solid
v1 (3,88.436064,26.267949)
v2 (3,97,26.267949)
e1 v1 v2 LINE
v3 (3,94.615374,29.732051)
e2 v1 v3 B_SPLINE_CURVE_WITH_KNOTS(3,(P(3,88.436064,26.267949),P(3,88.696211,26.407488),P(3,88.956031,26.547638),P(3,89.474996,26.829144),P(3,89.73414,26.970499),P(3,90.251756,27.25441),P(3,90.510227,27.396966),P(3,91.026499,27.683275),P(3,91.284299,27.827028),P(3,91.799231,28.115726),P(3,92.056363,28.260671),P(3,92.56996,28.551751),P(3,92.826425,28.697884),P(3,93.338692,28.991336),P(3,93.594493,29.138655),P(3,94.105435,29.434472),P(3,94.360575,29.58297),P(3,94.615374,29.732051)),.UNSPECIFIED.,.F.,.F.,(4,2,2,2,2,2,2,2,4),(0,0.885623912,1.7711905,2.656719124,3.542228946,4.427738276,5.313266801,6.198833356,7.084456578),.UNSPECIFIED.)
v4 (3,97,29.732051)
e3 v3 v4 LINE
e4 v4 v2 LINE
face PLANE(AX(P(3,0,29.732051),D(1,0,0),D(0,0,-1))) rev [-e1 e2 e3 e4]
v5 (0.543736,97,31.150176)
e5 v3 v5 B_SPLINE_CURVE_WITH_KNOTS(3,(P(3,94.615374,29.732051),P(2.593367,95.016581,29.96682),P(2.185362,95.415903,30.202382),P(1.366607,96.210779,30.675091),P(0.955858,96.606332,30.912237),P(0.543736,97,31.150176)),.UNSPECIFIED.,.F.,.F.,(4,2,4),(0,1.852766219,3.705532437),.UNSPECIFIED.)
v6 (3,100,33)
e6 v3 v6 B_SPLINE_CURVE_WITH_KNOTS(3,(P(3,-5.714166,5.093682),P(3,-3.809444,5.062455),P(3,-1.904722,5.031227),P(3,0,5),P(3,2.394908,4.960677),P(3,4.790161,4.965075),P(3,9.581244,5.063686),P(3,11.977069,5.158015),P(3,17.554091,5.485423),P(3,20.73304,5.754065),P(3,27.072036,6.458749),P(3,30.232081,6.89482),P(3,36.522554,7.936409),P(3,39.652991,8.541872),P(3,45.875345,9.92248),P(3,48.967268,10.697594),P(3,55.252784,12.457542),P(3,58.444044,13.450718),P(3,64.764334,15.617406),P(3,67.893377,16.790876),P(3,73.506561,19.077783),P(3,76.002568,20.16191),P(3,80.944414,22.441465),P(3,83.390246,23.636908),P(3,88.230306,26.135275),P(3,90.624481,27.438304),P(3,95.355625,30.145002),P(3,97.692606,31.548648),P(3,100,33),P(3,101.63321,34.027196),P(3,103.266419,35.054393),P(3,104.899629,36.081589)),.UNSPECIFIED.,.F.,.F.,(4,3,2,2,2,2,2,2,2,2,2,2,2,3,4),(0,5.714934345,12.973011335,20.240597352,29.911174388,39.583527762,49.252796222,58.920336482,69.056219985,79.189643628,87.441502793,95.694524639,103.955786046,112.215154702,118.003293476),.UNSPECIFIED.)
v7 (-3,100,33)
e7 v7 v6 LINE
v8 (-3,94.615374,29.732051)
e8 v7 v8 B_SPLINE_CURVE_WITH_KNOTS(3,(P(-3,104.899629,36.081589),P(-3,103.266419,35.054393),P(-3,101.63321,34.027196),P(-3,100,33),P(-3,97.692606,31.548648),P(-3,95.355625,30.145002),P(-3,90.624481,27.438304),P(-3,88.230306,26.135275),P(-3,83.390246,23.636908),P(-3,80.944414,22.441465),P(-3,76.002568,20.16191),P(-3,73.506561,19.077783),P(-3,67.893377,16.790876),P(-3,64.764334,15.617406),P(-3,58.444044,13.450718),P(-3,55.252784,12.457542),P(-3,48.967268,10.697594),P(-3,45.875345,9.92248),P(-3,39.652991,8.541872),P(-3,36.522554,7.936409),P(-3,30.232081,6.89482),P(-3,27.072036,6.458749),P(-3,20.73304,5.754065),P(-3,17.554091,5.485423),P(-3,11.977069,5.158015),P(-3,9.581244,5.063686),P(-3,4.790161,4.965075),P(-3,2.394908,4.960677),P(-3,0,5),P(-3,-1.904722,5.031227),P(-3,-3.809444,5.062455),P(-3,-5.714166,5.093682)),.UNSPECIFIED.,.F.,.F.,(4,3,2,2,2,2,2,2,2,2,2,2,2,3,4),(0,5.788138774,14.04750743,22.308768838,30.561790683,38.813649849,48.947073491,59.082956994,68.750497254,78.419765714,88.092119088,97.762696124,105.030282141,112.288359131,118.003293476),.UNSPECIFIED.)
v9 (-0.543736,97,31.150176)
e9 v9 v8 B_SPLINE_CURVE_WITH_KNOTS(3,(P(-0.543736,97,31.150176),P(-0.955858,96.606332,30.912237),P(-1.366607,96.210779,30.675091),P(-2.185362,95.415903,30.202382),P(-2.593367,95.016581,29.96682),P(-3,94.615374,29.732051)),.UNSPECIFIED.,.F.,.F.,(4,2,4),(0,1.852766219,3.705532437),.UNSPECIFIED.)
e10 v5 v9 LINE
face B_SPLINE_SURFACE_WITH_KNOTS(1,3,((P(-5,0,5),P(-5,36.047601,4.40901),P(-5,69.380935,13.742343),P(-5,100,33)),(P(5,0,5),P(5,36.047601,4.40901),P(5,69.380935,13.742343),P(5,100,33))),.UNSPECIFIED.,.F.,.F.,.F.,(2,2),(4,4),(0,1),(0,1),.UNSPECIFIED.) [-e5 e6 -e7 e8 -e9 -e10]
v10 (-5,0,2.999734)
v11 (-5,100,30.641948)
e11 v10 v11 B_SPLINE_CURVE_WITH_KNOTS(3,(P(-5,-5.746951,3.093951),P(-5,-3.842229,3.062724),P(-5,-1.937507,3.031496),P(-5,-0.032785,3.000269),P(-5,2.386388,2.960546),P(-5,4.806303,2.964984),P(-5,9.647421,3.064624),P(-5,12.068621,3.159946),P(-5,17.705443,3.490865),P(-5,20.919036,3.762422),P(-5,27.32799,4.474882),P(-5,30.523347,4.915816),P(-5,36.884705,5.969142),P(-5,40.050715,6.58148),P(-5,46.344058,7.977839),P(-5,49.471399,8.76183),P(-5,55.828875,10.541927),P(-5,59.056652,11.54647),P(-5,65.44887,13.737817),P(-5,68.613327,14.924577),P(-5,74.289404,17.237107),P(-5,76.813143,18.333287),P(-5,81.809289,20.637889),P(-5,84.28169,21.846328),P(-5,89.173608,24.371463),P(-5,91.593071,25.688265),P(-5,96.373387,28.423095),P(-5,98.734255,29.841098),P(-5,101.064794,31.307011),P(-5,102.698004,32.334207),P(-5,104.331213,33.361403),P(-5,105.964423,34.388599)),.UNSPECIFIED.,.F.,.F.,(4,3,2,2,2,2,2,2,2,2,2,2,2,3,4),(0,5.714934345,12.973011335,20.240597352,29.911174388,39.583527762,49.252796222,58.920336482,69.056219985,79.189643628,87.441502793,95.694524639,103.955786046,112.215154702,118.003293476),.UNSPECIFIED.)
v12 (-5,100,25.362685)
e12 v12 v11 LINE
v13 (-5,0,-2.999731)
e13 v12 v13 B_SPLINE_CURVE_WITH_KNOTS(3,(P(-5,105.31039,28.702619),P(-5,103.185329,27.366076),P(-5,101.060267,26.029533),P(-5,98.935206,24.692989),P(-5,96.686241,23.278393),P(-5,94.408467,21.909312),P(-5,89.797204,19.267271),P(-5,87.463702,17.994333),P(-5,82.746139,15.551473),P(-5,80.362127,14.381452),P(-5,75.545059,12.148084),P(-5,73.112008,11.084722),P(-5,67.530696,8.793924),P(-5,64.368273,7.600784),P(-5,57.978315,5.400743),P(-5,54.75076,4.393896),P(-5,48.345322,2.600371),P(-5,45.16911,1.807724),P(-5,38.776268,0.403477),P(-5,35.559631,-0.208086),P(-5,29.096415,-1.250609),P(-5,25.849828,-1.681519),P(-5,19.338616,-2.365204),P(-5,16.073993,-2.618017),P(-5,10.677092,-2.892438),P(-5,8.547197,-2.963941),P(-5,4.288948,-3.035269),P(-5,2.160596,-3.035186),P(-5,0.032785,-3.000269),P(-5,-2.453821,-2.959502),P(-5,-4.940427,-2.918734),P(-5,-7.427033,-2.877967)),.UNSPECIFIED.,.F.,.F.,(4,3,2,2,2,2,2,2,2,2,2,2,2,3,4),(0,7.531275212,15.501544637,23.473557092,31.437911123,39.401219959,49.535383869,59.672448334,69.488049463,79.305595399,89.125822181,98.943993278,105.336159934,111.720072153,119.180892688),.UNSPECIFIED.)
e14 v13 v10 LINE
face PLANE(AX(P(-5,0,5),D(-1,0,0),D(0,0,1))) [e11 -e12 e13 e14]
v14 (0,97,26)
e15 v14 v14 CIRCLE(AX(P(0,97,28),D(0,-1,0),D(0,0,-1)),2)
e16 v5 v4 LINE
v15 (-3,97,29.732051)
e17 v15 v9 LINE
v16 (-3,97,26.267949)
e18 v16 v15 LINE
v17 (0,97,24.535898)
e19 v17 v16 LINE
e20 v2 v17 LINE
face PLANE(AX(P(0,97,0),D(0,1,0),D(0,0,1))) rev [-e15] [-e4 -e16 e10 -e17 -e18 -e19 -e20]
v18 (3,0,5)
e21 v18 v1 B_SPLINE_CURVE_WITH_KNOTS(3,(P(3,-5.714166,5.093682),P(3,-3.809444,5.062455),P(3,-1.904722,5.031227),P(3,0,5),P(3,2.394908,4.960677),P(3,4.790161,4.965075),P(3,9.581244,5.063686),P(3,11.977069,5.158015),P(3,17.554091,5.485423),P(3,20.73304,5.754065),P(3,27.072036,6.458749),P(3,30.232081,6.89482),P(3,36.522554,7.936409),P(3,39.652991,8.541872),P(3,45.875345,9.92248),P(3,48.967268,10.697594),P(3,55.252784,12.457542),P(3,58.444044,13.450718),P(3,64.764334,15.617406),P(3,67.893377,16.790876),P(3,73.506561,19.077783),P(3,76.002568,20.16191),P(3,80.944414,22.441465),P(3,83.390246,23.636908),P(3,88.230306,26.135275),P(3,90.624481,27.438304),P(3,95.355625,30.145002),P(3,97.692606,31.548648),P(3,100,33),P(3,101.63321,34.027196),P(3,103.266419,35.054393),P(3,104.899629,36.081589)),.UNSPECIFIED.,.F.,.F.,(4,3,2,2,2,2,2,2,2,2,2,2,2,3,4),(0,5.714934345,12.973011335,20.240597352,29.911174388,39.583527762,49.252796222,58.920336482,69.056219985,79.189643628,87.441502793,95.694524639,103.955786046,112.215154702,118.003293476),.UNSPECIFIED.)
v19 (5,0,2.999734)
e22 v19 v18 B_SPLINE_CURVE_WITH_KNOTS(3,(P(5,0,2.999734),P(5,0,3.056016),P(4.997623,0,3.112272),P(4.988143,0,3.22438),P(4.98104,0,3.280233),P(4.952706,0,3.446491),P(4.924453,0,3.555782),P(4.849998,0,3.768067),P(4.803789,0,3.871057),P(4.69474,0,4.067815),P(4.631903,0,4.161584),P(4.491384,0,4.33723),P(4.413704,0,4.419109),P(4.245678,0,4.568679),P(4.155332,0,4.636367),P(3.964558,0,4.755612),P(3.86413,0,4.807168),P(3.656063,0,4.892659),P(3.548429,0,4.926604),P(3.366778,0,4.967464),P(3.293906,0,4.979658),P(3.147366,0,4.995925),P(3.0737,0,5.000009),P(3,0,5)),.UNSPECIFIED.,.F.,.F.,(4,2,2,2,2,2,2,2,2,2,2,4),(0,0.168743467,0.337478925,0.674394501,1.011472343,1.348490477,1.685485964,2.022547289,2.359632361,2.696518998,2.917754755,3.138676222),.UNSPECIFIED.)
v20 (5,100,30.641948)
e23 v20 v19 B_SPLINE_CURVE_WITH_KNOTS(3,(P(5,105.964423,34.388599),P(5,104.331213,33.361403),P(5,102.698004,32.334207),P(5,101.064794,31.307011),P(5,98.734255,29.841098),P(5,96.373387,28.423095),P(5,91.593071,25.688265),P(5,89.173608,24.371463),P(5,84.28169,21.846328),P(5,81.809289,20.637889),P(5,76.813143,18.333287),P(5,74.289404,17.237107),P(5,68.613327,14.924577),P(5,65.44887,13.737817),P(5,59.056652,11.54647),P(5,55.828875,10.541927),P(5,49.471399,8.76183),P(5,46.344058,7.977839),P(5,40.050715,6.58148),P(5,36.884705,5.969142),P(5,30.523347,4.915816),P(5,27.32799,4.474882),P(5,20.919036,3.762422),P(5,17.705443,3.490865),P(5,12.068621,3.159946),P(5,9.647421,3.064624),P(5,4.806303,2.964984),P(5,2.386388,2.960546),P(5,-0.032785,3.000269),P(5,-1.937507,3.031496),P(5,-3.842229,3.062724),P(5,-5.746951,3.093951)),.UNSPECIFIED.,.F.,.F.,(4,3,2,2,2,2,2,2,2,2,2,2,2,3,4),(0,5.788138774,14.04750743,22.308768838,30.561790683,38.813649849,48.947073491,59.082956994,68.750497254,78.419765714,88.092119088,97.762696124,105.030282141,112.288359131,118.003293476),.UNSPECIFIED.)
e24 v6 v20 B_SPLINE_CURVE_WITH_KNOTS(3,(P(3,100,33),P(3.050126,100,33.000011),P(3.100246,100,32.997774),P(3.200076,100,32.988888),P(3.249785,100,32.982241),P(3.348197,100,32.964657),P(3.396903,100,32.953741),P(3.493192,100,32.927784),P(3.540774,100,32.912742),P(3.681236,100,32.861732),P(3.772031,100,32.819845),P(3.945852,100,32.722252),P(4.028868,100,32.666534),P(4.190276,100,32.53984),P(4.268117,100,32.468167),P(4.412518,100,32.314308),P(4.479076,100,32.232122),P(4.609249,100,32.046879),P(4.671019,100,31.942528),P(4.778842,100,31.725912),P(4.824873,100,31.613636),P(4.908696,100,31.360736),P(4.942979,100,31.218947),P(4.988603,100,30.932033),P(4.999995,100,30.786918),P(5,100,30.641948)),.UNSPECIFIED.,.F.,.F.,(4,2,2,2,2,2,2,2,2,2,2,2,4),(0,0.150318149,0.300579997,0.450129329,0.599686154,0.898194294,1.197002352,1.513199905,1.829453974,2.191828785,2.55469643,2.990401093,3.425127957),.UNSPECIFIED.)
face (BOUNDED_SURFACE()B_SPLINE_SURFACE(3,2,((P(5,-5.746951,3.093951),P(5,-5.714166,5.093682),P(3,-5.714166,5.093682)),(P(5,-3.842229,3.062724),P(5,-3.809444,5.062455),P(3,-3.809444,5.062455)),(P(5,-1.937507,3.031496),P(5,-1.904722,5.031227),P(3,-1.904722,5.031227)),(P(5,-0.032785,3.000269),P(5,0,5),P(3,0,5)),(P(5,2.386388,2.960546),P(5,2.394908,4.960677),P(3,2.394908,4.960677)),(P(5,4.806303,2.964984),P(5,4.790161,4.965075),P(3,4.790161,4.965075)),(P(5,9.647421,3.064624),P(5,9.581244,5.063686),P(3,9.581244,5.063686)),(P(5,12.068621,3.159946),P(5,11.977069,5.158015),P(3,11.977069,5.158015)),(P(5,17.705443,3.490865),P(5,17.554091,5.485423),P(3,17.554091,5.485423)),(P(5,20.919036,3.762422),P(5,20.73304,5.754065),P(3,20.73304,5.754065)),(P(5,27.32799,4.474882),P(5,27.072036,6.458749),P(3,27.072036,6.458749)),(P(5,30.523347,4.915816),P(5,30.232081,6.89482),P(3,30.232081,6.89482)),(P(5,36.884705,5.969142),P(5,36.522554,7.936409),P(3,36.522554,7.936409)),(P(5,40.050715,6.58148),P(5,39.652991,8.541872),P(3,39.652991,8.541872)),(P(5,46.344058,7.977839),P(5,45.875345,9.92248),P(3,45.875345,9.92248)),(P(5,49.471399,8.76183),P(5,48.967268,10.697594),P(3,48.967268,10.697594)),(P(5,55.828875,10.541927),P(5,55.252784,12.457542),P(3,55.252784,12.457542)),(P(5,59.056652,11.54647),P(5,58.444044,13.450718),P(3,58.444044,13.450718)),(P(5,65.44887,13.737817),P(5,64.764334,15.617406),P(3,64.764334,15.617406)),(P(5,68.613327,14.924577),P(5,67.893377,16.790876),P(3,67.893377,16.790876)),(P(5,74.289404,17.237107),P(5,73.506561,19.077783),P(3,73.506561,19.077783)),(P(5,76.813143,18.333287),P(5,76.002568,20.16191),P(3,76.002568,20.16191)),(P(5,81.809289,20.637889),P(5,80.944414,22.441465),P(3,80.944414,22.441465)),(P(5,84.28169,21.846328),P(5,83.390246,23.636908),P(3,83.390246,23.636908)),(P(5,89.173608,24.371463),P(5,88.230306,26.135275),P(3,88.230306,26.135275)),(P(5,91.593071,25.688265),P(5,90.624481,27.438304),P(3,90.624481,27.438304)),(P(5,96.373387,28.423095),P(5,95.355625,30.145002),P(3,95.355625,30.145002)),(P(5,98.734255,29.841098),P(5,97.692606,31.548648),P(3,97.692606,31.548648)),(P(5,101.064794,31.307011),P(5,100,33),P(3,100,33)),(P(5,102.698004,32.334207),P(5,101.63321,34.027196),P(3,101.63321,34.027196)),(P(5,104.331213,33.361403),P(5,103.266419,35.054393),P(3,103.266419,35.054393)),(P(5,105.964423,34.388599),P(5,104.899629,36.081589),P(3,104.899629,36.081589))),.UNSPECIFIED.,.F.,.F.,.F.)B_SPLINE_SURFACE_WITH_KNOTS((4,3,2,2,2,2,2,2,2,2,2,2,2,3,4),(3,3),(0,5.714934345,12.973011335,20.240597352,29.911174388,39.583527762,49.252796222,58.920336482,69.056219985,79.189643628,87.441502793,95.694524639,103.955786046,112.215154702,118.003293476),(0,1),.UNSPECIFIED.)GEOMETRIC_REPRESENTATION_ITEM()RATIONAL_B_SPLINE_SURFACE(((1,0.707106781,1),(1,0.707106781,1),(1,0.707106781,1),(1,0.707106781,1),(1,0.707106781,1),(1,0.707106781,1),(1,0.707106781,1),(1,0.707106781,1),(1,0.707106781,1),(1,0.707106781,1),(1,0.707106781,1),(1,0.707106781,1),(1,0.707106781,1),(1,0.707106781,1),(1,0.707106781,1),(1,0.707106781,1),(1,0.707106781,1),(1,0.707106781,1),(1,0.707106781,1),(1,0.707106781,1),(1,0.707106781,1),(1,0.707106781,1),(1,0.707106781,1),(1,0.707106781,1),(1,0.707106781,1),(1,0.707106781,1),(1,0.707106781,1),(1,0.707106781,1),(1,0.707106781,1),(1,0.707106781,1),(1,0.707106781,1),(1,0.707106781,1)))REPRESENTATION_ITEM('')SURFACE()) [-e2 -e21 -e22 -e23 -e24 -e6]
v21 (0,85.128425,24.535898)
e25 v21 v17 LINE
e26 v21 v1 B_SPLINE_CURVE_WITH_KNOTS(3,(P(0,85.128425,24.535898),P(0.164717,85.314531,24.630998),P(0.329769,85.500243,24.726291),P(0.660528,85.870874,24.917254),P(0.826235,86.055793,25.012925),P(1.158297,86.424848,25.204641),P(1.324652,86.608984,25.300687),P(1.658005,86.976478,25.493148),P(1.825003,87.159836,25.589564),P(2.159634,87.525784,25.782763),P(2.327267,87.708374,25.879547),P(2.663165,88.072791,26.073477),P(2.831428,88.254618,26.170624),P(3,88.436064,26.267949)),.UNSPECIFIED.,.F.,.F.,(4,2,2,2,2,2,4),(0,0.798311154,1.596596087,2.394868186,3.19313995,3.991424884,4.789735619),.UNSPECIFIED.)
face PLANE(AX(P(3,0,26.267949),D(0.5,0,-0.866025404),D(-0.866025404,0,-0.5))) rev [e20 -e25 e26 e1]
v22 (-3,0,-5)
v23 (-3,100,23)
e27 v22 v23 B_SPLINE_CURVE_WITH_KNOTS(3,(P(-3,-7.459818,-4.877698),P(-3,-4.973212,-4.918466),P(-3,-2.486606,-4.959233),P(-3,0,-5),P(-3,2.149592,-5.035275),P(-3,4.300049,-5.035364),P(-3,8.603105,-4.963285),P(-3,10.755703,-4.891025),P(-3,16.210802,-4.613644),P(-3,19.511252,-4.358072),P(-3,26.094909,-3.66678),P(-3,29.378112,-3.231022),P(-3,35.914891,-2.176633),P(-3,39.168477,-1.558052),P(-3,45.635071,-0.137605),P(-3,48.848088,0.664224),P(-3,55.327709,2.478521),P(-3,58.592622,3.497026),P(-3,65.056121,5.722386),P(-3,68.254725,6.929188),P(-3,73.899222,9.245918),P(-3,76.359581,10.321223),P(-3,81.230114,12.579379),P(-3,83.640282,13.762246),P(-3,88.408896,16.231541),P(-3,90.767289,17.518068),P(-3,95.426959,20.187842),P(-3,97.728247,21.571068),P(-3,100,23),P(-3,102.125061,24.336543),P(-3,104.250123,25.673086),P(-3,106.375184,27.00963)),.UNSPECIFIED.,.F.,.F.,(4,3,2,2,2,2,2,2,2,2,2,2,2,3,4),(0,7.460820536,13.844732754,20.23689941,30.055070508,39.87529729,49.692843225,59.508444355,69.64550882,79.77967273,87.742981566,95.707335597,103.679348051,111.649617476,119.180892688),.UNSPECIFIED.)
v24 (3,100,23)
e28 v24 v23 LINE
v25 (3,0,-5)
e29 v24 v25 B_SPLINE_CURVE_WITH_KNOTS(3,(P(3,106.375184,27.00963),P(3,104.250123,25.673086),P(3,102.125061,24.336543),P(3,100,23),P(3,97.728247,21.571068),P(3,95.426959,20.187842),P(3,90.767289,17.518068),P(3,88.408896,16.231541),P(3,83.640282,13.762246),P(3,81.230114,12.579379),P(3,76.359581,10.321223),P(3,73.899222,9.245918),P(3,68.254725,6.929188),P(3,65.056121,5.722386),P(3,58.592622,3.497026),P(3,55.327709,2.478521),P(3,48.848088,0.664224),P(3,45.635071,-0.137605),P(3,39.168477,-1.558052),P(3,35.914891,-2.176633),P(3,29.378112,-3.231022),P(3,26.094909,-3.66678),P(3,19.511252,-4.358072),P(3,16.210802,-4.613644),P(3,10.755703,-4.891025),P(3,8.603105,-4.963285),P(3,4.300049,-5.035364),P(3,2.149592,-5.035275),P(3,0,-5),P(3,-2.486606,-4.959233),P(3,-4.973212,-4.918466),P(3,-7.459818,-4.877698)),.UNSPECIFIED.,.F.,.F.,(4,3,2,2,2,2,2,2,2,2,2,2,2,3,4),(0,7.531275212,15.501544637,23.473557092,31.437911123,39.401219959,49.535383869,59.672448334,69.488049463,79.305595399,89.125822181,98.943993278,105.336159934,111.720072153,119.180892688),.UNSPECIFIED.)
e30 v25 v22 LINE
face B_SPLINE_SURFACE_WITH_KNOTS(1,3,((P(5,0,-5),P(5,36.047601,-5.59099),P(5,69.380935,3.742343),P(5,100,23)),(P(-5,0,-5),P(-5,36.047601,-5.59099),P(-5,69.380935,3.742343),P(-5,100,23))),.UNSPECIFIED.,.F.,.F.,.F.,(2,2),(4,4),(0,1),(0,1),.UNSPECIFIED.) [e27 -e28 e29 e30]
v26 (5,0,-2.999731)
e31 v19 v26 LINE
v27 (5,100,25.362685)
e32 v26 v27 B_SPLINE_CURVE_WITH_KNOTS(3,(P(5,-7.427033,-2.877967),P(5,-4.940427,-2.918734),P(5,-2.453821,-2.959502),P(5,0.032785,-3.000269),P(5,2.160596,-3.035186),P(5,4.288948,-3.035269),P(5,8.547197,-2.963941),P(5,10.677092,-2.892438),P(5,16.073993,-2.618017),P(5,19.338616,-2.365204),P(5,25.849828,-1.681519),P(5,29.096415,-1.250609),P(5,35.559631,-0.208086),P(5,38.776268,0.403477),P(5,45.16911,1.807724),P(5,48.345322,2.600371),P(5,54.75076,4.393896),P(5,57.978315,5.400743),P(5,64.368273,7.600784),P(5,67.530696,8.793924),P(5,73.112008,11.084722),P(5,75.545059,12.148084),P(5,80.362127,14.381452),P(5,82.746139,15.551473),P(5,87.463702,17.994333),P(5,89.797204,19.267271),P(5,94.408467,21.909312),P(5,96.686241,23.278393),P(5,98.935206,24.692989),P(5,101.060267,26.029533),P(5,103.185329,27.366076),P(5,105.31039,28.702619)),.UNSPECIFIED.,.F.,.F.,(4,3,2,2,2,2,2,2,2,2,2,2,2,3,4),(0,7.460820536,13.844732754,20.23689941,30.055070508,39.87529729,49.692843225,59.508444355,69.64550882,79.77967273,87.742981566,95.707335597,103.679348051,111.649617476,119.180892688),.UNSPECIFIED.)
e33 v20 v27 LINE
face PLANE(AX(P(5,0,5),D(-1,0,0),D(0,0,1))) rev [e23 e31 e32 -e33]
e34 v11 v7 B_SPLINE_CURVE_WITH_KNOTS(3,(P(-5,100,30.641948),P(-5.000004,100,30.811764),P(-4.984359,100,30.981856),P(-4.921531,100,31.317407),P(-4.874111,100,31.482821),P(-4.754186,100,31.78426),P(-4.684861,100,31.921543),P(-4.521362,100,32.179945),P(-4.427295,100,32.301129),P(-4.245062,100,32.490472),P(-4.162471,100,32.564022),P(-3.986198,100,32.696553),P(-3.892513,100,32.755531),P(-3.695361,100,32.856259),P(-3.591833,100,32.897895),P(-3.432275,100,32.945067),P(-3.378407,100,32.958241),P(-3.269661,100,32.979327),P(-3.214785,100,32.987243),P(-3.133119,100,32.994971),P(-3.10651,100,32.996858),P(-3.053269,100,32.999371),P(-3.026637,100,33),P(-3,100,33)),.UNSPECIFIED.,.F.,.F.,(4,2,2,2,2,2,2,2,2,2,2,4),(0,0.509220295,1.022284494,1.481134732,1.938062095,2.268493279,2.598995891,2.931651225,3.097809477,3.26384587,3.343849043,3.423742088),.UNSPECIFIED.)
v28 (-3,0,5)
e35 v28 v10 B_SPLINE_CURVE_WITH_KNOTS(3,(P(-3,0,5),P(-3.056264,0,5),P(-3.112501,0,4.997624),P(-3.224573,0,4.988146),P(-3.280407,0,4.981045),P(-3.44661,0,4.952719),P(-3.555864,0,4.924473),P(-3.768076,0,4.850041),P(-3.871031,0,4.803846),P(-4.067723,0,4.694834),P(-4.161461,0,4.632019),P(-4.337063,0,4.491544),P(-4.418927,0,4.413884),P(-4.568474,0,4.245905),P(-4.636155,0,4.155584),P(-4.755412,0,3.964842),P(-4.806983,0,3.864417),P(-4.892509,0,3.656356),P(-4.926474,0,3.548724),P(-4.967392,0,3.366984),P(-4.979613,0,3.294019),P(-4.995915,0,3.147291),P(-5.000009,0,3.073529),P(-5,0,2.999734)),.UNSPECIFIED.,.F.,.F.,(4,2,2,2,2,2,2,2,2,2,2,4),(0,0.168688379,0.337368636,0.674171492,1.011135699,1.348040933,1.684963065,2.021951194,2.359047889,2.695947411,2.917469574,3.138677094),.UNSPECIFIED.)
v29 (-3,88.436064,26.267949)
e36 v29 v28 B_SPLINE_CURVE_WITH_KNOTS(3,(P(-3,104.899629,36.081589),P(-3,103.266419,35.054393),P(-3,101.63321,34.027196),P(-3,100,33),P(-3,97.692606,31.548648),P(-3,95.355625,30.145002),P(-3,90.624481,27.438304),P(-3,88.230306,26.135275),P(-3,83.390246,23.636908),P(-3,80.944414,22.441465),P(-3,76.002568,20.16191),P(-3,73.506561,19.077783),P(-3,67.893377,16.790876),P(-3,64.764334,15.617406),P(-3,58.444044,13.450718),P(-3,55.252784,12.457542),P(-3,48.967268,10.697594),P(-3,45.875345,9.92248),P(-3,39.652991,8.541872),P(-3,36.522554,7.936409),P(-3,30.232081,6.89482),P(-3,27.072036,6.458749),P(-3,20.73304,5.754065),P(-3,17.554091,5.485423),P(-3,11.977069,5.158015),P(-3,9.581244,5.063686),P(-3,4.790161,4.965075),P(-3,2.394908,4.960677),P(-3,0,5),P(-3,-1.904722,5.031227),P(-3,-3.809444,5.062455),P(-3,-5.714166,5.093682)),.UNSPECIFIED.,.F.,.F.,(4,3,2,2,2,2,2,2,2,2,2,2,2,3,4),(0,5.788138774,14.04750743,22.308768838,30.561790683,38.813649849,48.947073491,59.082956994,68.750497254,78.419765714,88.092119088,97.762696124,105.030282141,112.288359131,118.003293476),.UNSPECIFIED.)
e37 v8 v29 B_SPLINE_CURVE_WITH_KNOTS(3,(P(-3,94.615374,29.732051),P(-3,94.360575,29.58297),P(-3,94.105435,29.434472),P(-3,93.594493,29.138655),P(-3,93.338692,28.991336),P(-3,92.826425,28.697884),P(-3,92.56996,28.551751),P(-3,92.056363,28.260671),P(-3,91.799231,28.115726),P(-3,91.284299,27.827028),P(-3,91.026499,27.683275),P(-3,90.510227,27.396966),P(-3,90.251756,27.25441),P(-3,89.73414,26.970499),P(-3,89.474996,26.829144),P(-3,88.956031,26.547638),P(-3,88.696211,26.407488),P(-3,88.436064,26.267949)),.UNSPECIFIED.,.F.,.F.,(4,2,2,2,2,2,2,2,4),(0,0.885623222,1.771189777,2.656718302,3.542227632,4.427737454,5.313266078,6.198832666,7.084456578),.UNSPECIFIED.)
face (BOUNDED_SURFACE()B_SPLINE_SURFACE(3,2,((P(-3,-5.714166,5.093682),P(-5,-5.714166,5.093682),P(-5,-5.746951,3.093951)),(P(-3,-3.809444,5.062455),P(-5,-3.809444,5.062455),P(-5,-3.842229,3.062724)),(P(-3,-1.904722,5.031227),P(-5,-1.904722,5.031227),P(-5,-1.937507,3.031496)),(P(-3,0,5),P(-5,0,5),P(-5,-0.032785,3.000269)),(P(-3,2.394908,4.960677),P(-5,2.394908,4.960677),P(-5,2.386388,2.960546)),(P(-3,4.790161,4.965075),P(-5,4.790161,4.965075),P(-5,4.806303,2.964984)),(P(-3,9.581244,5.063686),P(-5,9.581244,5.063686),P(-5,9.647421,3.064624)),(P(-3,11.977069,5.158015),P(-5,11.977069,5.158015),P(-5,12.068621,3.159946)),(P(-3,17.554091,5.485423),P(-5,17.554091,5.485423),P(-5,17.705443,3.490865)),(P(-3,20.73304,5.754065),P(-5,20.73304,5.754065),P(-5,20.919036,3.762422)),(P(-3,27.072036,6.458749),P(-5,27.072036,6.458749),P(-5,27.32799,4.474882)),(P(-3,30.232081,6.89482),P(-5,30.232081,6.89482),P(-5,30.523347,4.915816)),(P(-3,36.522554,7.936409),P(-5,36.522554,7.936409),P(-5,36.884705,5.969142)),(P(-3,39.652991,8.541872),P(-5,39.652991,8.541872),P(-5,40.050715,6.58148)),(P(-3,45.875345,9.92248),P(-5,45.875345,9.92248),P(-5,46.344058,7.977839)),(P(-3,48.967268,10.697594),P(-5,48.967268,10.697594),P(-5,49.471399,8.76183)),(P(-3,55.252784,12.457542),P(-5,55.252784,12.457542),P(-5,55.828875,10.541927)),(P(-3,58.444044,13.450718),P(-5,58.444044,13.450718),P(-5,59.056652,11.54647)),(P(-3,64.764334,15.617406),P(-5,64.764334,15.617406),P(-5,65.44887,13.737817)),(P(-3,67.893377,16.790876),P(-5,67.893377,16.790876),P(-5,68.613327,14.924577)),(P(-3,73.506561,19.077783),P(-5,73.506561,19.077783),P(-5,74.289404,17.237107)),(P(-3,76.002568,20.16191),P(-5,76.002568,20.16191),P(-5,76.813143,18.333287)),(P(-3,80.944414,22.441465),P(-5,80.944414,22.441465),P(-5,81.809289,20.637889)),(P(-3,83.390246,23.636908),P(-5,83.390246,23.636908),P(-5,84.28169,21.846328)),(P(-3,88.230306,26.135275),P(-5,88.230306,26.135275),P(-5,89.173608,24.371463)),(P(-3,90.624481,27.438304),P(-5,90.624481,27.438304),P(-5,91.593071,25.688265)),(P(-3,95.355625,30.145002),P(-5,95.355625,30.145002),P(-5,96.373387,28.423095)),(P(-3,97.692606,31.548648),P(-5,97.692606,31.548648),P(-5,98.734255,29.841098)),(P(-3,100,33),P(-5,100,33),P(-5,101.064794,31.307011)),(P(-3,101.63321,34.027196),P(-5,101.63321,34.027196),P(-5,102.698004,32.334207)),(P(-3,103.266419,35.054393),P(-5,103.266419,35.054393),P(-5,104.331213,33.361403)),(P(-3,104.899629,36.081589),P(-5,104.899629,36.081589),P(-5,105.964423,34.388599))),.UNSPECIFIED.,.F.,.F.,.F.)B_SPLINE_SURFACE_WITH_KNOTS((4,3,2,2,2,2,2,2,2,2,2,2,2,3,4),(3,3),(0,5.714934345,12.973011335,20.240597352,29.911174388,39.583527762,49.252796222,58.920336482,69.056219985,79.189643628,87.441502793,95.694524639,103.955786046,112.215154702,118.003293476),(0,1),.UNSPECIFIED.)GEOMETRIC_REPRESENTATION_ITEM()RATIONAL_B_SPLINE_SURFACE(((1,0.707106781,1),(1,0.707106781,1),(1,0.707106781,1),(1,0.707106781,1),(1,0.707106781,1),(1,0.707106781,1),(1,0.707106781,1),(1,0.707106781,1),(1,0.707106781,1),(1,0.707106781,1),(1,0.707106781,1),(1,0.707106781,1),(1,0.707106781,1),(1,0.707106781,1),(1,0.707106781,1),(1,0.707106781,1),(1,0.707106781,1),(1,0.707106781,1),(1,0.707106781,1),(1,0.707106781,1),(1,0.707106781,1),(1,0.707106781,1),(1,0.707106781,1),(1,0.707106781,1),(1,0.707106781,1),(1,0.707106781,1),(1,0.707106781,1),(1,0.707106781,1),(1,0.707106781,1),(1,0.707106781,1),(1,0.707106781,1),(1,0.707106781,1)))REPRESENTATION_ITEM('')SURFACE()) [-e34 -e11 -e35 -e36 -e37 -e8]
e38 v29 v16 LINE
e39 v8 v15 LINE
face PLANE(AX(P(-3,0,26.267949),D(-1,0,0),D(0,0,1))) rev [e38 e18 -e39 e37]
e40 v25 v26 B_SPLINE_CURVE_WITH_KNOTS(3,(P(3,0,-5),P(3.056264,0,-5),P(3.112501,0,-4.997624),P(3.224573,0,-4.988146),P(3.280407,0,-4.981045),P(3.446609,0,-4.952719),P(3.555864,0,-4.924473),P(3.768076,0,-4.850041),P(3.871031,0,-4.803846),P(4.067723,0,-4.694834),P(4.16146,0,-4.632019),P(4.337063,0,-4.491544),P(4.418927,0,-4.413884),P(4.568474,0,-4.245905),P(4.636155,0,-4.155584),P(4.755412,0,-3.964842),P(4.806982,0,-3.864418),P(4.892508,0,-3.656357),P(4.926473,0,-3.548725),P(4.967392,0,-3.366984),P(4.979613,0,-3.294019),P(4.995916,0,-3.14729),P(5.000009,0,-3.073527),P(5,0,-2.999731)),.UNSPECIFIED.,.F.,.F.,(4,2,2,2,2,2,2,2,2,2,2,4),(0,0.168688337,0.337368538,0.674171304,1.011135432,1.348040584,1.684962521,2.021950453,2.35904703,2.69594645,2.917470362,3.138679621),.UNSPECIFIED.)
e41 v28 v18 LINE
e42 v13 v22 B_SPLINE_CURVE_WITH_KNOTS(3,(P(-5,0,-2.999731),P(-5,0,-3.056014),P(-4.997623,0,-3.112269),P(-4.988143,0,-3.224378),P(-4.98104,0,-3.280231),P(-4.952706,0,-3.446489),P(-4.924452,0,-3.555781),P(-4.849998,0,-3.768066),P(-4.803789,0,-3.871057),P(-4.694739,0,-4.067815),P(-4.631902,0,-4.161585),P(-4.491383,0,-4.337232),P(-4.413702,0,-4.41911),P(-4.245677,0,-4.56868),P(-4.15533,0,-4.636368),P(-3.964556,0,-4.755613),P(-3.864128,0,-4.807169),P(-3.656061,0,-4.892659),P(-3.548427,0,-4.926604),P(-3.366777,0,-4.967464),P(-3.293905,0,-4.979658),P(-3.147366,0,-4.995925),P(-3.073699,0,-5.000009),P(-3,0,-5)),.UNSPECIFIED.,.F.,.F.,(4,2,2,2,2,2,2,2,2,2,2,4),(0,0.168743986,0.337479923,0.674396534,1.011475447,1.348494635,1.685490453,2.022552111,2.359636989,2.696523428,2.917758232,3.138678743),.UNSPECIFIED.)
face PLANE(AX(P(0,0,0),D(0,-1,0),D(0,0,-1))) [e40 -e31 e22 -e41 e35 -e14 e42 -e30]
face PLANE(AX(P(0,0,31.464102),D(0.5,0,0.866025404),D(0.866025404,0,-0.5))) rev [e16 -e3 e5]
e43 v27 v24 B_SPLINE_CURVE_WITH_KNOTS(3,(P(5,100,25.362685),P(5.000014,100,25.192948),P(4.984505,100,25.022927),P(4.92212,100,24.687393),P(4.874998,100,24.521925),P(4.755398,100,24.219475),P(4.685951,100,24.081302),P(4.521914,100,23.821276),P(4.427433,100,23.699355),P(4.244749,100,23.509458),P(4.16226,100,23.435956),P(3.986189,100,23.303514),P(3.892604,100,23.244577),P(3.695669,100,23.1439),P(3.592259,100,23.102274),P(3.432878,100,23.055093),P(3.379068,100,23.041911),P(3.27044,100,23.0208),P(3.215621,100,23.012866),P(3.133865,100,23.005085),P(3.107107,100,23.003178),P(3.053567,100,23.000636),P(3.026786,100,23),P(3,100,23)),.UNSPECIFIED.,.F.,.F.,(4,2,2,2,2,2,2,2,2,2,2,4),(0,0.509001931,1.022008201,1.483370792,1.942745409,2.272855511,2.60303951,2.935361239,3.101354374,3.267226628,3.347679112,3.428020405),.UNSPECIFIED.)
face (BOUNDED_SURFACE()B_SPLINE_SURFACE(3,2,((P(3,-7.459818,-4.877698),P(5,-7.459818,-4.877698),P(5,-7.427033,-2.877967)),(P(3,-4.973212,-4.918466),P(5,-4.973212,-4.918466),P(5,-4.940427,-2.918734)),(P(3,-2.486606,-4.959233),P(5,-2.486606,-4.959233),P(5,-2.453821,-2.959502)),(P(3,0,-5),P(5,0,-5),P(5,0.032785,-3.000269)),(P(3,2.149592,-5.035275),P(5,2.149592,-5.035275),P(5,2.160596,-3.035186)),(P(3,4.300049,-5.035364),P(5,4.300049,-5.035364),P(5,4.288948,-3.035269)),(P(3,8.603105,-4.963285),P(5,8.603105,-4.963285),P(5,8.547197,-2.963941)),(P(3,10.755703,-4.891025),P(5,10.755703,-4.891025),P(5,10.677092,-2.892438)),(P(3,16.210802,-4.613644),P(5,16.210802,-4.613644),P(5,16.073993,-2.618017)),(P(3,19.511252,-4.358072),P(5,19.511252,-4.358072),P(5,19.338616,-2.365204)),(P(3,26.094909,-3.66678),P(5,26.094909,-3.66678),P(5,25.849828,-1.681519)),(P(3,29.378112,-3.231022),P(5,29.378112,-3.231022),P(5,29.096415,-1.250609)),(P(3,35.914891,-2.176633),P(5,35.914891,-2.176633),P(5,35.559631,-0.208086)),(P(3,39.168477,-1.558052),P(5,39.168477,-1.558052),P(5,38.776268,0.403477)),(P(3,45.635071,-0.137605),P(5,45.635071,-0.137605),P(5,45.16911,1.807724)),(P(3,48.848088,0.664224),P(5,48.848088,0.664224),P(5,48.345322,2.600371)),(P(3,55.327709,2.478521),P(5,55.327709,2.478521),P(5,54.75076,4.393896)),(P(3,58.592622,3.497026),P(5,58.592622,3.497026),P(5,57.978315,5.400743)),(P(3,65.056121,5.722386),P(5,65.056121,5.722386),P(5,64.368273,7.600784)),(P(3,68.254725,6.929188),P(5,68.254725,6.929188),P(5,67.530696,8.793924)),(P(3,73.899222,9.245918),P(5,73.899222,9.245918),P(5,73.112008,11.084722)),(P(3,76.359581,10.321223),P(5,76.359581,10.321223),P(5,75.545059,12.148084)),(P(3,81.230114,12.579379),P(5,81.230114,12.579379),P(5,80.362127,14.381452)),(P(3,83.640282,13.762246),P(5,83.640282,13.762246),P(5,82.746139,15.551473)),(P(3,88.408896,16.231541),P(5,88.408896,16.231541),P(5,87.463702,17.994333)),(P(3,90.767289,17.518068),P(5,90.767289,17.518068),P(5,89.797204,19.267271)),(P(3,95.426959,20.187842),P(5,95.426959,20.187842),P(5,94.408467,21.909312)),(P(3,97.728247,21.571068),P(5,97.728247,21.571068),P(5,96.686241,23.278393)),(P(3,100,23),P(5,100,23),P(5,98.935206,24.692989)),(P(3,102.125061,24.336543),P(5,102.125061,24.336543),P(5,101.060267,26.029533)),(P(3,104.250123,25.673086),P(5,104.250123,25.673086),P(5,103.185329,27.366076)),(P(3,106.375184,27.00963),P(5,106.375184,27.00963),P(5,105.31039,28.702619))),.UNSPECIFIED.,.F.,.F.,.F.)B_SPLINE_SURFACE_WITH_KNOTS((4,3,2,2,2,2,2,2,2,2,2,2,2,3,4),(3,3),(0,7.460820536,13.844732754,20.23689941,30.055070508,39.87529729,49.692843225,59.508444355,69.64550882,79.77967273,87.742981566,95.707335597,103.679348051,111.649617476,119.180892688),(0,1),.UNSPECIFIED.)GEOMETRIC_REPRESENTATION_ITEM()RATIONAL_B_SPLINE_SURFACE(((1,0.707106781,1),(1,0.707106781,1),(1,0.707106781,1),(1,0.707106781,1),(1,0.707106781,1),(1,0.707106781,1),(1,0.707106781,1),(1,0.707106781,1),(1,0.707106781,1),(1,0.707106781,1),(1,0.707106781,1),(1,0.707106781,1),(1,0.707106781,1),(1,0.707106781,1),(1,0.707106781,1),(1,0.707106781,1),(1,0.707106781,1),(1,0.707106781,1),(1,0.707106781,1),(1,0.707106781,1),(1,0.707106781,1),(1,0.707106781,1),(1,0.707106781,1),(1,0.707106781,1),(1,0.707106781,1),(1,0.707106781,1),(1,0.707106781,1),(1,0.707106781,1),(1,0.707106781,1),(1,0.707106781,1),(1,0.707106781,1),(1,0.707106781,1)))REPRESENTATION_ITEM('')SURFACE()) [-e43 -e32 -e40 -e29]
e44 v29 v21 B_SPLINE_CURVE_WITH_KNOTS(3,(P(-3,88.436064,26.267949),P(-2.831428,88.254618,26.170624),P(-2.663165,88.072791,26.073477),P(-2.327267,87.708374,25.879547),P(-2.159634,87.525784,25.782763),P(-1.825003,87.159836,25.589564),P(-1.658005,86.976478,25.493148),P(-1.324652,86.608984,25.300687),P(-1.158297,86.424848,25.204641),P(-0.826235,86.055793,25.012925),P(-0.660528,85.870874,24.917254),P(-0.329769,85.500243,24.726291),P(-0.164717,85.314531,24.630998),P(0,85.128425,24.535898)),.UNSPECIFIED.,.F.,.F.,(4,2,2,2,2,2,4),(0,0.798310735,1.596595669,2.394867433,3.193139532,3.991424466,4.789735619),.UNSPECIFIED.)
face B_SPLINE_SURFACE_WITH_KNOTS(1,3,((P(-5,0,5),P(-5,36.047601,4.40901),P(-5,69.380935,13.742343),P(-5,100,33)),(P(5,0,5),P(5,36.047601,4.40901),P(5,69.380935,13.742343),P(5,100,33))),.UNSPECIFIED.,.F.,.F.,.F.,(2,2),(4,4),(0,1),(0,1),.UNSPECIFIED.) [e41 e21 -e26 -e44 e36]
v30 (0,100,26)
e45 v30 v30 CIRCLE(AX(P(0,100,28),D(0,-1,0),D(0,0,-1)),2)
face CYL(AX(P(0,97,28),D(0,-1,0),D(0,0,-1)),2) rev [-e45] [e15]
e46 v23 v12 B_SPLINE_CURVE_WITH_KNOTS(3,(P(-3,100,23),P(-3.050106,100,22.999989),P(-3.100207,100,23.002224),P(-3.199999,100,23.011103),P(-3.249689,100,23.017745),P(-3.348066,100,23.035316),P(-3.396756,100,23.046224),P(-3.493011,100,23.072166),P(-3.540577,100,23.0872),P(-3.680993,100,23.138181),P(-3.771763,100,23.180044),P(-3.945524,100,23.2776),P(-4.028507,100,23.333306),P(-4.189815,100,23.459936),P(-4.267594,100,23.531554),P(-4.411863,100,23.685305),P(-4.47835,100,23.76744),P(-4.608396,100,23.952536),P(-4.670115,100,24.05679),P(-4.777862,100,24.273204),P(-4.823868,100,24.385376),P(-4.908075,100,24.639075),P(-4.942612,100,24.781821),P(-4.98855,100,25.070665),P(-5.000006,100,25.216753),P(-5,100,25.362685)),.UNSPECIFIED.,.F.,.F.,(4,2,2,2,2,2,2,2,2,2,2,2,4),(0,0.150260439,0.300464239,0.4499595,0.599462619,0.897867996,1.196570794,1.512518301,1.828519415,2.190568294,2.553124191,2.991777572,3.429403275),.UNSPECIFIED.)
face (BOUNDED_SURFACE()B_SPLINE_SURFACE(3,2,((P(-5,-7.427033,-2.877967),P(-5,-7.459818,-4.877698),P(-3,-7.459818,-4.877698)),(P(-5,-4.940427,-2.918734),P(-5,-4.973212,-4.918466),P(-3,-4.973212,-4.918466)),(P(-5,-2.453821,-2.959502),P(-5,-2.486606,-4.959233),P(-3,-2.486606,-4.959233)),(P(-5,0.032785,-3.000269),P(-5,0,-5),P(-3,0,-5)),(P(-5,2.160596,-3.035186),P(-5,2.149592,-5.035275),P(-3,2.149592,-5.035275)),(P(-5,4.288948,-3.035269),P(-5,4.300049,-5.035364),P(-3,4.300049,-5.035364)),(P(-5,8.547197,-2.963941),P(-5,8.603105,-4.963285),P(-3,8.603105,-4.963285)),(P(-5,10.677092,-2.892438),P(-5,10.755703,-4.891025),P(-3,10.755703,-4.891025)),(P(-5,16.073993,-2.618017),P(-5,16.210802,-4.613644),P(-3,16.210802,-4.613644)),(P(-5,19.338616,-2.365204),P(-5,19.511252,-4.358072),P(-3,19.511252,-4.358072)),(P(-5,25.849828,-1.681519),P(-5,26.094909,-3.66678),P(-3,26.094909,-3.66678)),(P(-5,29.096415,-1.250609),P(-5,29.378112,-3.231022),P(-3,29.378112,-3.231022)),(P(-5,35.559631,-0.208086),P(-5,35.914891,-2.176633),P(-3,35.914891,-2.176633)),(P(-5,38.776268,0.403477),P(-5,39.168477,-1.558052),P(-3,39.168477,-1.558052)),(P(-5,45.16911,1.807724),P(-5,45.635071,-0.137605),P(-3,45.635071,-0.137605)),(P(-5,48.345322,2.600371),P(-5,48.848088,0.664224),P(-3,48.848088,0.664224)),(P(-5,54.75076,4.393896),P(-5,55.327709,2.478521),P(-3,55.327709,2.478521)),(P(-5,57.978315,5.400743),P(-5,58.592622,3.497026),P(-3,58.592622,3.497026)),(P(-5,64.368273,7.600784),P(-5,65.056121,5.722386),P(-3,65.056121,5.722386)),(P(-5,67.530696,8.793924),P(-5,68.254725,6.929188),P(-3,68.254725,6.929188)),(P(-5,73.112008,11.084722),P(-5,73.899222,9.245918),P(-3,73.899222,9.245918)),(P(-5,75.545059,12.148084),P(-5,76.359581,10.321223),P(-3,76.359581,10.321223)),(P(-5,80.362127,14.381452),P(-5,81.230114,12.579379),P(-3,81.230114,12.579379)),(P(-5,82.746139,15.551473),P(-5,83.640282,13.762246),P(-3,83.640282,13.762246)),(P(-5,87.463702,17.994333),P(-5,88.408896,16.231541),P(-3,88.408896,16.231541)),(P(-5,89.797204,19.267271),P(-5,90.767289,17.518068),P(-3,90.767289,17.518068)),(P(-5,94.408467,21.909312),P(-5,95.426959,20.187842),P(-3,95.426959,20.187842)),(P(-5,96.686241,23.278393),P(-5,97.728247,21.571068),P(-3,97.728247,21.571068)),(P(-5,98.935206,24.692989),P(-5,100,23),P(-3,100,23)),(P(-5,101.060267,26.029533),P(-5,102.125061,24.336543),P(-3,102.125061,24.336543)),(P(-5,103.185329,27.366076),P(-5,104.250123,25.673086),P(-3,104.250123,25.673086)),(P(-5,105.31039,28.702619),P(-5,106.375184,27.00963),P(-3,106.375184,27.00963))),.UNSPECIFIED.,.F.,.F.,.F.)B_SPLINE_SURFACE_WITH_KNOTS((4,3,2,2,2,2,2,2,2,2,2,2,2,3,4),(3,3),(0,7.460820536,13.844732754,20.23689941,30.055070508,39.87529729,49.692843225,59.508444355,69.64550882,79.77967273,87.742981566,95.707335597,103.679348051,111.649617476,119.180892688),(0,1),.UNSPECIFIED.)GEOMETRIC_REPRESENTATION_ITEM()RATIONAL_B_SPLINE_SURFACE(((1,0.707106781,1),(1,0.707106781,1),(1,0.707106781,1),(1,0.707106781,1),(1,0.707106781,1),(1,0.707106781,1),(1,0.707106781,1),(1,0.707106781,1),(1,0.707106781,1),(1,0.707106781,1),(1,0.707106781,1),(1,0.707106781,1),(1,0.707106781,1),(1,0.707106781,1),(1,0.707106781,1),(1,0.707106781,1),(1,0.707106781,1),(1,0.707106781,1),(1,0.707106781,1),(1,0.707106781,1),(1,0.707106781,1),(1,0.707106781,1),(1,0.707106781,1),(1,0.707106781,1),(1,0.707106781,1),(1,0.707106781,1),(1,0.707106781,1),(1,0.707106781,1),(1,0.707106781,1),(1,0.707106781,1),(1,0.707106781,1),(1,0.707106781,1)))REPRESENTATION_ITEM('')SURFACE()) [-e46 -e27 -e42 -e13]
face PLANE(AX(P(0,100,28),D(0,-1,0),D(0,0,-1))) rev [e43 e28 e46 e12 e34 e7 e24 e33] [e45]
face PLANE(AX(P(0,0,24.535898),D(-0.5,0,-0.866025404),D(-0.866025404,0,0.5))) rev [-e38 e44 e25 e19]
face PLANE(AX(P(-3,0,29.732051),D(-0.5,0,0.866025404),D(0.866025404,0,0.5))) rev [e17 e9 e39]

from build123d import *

# Parameters (mm, degrees)
SWEEP1_START          = -5
SWEEP1_DEPTH          = 10
CUT_EXTRUDE1_DEPTH    = 103.581674908
F_4_0MM_DOWEL_HOLE1_D = 4
FILLET2_R             = 2


# Read off the part's stored shape, not the designer's step: Sweep1
with BuildPart() as part:
    # Sweep1 outline → Sweep1 (new body)
    with BuildSketch(Plane.YZ.offset(SWEEP1_START)):
        with BuildLine():
            add(Edge.make_bspline(
                [(0, 5), (36.047601353, 4.409009522), (69.380934685, 13.742342856), (100, 33)],
                knots=[0, 0, 0, 0, 1, 1, 1, 1], degree=3))
            Line((0, 5), (0, -5))
            add(Edge.make_bspline(
                [(0, -5), (36.047601353, -5.590990478), (69.380934685, 3.742342856), (100, 23)],
                knots=[0, 0, 0, 0, 1, 1, 1, 1], degree=3))
            Line((100, 23), (100, 33))
        make_face()
    extrude(amount=SWEEP1_DEPTH)

    # Sketch3 → Cut-Extrude1 (cut, through all)
    with BuildSketch(Plane(origin=(0, 97, 0), x_dir=(1, 0, 0), z_dir=(0, 1, 0))):
        Polygon((0, -24.535898385), (-3, -26.267949192), (-3, -29.732050808), (0, -31.464101615), (3, -29.732050808), (3, -26.267949192), align=None)
    extrude(amount=-CUT_EXTRUDE1_DEPTH, mode=Mode.SUBTRACT)

    # Ø4.0mm Dowel Hole1 (through all)
    with Locations(Plane(origin=(0, 97, 0), x_dir=(-1, 0, 0), z_dir=(0, -1, 0))):
        with Locations((0, -28)):
            Hole(F_4_0MM_DOWEL_HOLE1_D / 2)

    # Fillet2
    fillet2_edges = [part.edges().sort_by_distance(p)[0] for p in [
        (-5, 52.035701014, 11.556757142),
        (5, 52.035701014, 11.556757142),
        (-5, 52.035701014, 1.556757142),
        (5, 52.035701014, 1.556757142),
    ]]
    fillet(fillet2_edges, radius=FILLET2_R - 0.0001)  # a hair under: the kernel refuses the full size


solid = part.part
